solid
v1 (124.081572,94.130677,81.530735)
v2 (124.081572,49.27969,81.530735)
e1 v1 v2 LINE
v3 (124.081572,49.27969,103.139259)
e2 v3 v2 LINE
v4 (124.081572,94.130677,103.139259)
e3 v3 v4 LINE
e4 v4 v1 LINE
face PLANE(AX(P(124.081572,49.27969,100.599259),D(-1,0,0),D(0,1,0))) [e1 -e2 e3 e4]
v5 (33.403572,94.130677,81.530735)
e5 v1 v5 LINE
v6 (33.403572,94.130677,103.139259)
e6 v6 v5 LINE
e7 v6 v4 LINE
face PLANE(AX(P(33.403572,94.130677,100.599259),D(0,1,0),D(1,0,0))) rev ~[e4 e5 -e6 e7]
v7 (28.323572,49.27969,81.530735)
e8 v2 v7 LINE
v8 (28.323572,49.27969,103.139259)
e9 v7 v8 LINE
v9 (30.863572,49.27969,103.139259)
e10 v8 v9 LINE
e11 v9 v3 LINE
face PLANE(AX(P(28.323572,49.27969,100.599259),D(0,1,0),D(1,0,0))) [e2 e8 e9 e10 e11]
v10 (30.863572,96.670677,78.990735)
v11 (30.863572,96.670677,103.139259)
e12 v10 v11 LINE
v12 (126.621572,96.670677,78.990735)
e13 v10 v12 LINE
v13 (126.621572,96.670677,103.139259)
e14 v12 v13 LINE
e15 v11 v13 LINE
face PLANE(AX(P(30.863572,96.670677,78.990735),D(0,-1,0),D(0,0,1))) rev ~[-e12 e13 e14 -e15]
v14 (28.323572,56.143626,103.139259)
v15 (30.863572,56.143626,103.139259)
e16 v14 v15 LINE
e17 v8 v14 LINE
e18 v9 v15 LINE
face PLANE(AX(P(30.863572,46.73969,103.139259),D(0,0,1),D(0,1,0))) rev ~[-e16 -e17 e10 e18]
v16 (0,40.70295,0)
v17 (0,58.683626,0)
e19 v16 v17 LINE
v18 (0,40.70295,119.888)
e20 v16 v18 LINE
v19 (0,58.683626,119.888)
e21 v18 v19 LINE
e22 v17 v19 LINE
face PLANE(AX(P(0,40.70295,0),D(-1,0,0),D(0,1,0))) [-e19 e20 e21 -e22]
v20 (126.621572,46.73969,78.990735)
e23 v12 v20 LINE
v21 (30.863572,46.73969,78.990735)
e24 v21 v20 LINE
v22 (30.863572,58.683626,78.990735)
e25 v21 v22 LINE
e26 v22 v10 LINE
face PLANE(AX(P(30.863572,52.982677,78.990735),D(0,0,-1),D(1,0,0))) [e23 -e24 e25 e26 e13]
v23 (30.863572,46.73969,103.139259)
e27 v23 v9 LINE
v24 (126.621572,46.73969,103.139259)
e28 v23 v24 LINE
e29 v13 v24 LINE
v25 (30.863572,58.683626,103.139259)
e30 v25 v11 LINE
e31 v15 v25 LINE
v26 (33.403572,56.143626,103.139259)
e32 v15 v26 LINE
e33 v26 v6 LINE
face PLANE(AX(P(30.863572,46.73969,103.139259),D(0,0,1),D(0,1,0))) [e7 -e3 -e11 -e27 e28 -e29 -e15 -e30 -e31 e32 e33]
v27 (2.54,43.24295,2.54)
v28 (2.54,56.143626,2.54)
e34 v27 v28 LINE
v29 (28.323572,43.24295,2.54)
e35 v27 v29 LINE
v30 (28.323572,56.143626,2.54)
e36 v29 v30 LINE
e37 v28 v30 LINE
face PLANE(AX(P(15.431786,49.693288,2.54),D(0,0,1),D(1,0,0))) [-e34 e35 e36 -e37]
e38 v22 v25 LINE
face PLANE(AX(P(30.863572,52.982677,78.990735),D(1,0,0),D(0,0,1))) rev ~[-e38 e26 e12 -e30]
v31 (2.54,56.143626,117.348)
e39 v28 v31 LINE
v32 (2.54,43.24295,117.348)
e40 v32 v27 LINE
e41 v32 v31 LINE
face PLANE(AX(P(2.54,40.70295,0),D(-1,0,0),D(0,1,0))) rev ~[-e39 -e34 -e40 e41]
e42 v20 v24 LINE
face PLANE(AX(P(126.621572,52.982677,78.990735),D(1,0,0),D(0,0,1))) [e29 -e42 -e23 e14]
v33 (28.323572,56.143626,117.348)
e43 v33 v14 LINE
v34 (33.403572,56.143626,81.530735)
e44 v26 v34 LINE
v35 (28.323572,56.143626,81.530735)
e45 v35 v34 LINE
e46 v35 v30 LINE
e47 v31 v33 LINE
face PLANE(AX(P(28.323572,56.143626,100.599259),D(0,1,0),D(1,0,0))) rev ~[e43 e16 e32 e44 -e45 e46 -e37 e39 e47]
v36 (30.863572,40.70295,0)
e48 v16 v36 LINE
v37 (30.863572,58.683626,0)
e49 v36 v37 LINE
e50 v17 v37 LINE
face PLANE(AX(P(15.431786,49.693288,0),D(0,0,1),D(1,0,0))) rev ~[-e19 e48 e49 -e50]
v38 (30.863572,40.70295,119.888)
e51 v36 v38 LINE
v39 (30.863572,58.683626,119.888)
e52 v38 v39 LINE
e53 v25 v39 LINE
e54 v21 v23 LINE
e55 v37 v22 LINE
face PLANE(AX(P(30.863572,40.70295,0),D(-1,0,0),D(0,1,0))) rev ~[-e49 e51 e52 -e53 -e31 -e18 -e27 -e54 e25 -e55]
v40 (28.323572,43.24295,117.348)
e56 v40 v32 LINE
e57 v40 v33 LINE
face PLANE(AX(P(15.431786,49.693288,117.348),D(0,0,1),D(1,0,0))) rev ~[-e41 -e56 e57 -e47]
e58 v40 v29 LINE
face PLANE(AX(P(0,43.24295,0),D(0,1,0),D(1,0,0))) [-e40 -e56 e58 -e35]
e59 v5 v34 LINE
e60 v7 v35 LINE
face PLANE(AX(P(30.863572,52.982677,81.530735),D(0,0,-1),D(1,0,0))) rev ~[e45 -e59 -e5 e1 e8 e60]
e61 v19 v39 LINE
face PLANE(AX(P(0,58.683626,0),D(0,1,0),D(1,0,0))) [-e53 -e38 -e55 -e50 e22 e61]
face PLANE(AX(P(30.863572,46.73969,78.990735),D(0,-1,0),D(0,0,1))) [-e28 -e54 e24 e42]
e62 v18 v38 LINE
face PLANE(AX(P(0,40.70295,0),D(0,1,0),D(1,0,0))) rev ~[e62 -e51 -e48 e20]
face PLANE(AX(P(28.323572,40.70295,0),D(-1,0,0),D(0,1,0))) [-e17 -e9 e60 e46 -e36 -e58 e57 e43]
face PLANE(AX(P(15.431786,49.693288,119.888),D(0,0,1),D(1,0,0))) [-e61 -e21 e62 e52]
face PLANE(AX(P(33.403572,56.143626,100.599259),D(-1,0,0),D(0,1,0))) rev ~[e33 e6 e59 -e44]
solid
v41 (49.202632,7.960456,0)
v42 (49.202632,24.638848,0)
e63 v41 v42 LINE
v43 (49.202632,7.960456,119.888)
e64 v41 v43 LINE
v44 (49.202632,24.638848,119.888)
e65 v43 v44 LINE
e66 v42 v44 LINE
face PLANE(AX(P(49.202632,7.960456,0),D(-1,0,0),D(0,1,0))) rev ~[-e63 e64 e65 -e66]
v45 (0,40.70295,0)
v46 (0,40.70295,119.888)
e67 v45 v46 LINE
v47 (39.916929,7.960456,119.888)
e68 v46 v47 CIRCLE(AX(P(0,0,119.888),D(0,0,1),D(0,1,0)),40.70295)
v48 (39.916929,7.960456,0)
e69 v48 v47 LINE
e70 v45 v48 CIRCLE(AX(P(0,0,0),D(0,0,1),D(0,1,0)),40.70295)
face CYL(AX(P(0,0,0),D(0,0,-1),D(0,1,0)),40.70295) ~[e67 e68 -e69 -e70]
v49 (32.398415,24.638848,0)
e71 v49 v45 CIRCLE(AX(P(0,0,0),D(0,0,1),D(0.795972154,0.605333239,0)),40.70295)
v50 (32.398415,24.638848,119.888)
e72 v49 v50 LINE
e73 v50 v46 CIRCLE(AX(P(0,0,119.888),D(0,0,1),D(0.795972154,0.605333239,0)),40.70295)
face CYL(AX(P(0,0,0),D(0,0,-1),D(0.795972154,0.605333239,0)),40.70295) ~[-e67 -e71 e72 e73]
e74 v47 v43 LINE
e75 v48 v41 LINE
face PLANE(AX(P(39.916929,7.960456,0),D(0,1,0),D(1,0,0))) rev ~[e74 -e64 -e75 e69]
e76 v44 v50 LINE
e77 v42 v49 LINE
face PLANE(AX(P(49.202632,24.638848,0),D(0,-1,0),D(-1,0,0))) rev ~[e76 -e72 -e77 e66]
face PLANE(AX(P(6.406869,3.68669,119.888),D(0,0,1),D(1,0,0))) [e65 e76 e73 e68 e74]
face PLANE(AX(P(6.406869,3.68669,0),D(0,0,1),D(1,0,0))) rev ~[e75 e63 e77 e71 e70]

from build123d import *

# Parameters (mm, degrees)
F1_DEPTH = 119.888
F0_W     = 30.8635719121
F0_H     = 17.9806766311
F2_W     = 6.2429867685
F2_H     = 24.1485238075
F3_DEPTH = 95.758
F4_DEPTH = 43.688
F5_T     = -2.54


# Not quite as in the source:
# - a shell that OpenCascade refuses in one call is made with other operations: the cavity is built on its own and cut out


with BuildPart() as f1:
    # F0 (on Top) → F1 (new body)
    with BuildSketch(Plane.XY):
        with BuildLine():
            Line((49.202632159, 24.6388483793), (32.3984145703, 24.6388483793))
            ThreePointArc((32.3984145703, 24.6388483793), (18.0811546827, 36.4664498062), (0, 40.7029497227))
            ThreePointArc((0, 40.7029497227), (-25.8139115454, -31.4701777378), (39.9169293616, 7.9604564235))
            Line((39.9169293616, 7.9604564235), (49.202632159, 7.9604564235))
            Line((49.202632159, 7.9604564235), (49.202632159, 24.6388483793))
        make_face()
    extrude(amount=F1_DEPTH)


with BuildPart() as f1b:
    # F0 (on Top) → F1, piece 2 (new body)
    with BuildSketch(Plane.XY):
        with Locations((15.431785956, 49.6932880382)):
            Rectangle(F0_W, F0_H)
    extrude(amount=F1_DEPTH)

    # F2 (on face) → F3 (join)
    with BuildSketch(Plane.YZ.offset(30.8635719121)):
        with Locations((49.86118339, 91.0649970174)):
            Rectangle(F2_W, F2_H)
    extrude(amount=F3_DEPTH)

    # F4 (add): a face of the model
    f4_faces = [f1b.faces().sort_by_distance(p)[0] for p in [
        (78.7425719121, 52.9826767743, 91.0649970174),
    ]]
    extrude(f4_faces, amount=F4_DEPTH)

    # F5: a shell. OpenCascade refuses it in one call, so the cavity is built on its own and cut out:
    # the body offset inwards by the wall thickness, plus a prism from it out through each open face.
    f5_core = offset(f1b.part, amount=F5_T, kind=Kind.INTERSECTION, mode=Mode.PRIVATE)
    f5_exits = [f5_core.faces().sort_by_distance(p)[0] for p in [
        (78.335566, 71.543725, 100.599259),
    ]]
    add(f5_core, mode=Mode.SUBTRACT)
    extrude(f5_exits, amount=-F5_T, mode=Mode.SUBTRACT)


solid = Compound([f1.part, f1b.part])
